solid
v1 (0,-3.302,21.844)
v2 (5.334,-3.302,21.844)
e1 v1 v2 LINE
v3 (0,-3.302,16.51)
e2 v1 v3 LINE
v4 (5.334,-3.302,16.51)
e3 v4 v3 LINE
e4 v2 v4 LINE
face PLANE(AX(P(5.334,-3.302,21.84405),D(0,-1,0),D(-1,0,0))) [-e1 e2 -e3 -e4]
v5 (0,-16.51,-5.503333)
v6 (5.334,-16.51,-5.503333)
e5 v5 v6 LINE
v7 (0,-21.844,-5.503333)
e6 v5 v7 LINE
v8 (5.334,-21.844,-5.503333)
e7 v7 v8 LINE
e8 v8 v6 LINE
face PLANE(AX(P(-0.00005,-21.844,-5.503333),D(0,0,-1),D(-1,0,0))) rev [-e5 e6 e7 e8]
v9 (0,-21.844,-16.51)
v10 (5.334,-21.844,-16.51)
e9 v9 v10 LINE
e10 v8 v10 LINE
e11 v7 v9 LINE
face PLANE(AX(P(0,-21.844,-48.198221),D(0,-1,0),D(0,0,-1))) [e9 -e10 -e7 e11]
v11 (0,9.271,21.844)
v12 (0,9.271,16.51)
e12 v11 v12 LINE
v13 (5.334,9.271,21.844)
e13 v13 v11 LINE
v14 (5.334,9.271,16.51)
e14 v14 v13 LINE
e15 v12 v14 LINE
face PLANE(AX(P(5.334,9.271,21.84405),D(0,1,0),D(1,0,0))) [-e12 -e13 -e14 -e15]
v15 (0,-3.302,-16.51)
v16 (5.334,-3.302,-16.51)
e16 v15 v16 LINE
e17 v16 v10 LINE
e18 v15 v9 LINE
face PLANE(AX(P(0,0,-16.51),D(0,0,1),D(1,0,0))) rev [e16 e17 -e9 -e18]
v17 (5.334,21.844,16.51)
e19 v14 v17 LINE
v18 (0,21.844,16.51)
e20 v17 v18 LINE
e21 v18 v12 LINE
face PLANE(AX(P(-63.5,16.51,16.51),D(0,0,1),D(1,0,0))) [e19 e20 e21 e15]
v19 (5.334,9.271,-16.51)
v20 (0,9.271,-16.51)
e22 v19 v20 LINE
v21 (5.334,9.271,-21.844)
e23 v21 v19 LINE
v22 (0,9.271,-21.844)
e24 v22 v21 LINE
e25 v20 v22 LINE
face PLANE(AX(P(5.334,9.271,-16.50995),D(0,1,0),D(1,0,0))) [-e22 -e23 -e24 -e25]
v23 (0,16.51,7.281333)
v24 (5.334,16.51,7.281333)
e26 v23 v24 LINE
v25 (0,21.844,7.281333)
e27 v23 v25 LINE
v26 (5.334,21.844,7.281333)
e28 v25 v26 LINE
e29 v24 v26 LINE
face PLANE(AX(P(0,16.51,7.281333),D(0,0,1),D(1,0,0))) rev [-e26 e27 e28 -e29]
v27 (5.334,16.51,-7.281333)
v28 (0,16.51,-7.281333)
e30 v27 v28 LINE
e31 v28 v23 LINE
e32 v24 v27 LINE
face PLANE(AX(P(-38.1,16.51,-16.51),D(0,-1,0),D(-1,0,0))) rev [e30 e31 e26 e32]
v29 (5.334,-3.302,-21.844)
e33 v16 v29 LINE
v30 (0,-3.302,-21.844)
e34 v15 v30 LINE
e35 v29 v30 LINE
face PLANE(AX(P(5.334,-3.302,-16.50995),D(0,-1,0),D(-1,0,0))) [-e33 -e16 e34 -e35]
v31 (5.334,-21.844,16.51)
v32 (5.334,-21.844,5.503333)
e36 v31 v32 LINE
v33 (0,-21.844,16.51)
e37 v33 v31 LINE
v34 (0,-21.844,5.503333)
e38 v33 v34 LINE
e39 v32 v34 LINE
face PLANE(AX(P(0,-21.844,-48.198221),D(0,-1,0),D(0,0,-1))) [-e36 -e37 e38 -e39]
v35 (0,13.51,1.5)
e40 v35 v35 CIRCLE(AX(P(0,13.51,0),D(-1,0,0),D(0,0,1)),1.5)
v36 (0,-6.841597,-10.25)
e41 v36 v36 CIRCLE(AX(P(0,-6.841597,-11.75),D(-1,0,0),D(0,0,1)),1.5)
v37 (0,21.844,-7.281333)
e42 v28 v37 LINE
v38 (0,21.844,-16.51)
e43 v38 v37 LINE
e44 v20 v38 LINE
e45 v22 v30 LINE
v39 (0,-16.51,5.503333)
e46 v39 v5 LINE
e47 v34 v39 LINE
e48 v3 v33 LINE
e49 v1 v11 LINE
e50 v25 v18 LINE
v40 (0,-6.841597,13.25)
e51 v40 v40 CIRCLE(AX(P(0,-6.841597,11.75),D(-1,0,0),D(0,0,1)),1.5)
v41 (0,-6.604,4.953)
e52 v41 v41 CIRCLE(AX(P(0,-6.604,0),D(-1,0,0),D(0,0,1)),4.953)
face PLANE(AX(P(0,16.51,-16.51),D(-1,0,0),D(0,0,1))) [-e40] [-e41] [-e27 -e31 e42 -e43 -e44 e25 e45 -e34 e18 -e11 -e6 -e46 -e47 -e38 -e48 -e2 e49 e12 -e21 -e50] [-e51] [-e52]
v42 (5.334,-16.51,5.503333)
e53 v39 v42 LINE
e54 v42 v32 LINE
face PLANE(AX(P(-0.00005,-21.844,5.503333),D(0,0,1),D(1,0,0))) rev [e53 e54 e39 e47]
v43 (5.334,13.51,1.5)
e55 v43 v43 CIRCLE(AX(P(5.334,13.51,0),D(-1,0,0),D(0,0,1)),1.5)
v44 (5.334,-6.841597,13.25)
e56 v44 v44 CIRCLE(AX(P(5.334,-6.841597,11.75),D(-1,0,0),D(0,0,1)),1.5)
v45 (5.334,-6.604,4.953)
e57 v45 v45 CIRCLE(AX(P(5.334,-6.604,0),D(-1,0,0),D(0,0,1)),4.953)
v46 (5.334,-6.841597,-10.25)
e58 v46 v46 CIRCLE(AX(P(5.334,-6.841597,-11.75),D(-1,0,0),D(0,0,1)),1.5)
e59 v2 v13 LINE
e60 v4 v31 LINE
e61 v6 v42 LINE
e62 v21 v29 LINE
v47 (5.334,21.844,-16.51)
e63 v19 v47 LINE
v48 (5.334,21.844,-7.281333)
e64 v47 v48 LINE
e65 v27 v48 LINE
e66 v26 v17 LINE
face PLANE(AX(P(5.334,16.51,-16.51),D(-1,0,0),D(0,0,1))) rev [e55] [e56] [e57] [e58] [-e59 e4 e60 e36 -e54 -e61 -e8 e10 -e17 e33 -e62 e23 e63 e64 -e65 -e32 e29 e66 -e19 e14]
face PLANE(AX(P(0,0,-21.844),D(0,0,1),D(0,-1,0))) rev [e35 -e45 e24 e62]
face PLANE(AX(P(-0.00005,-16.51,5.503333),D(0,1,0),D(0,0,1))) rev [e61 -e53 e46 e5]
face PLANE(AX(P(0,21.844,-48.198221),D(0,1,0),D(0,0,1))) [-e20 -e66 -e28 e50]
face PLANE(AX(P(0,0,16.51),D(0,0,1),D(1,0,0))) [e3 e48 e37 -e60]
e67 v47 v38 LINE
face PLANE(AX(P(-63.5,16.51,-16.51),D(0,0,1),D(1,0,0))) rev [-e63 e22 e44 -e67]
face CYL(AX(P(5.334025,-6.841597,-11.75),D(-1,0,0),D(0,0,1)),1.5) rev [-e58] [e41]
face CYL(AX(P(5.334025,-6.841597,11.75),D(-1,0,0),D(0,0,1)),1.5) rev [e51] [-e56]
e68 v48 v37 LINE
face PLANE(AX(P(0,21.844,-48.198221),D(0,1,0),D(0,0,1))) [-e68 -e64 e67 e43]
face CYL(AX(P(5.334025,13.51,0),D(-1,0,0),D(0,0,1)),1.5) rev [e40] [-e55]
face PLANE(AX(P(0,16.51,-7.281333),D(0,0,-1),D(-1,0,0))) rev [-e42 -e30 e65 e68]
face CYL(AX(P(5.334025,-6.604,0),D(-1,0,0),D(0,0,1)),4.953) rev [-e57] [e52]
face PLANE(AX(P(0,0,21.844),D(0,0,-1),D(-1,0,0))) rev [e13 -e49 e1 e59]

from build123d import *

# Parameters (mm, degrees)
SKETCH2_W             = 33.02
SKETCH2_H             = 33.02
BOSS_EXTRUDE2_DEPTH   = 5.334
SKETCH3_W             = 33.02
SKETCH3_H             = 5.334
BOSS_EXTRUDE6_DEPTH   = 5.334
SKETCH6_W             = 11.006666666
SKETCH6_H             = 5.334
CUT_EXTRUDE2_DEPTH    = 32.349198203
CAVITY2_START         = -21.844
CAVITY2_OUTLINE_W     = 5.334
CAVITY2_OUTLINE_H     = 13.208
CAVITY2_OUTLINE_H_2   = 12.573
CAVITY2_DEPTH         = 5.334
CAVITY2_START_2       = 16.51
CAVITY2_2_OUTLINE_W   = 5.334
CAVITY2_2_OUTLINE_H   = 13.208
CAVITY2_2_OUTLINE_H_2 = 12.573
CAVITY2_2_DEPTH       = 5.334
CAVITY2_START_3       = -7.281333333
CAVITY2_3_OUTLINE_W   = 5.334
CAVITY2_3_OUTLINE_H   = 5.334
CAVITY2_3_DEPTH       = 14.562666666
SKETCH7_R             = 1.5
SKETCH7_R_2           = 4.953
CUT_EXTRUDE3_DEPTH    = 32.349198203


# Read off the part's stored shape, not the designer's step: Cavity2
with BuildPart() as part:
    # Sketch2 → Boss-Extrude2 (new body)
    with BuildSketch(Plane(origin=(0, 0, 0), x_dir=(0, 0, -1), z_dir=(1, 0, 0))):
        Rectangle(SKETCH2_W, SKETCH2_H)
    extrude(amount=BOSS_EXTRUDE2_DEPTH)

    # Sketch3 → Boss-Extrude6 (add, through all)
    with BuildSketch(Plane(origin=(5.334, 0, 0), x_dir=(0, 0, -1), z_dir=(1, 0, 0))):
        Polygon((-16.51, 16.51), (-16.51, 21.844), (-21.844, 21.844), (-21.844, -16.51), (-16.51, -16.51), align=None)
        with Locations((0, 19.177)):
            Rectangle(SKETCH3_W, SKETCH3_H)
        Polygon((21.844, 21.844), (21.844, -16.51), (16.51, -16.51), (16.51, 16.51), (16.51, 21.844), align=None)
        with Locations((0, -19.177)):
            Rectangle(SKETCH3_W, SKETCH3_H)
    extrude(amount=-BOSS_EXTRUDE6_DEPTH)

    # Sketch6 → Cut-Extrude2 (cut, through all)
    with BuildSketch(Plane(origin=(5.334, 0, 0), x_dir=(0, 0, -1), z_dir=(1, 0, 0))):
        with Locations((0, -19.177)):
            Rectangle(SKETCH6_W, SKETCH6_H)
    extrude(amount=-CUT_EXTRUDE2_DEPTH, mode=Mode.SUBTRACT)

    # Cavity2 outline → Cavity2 (cut)
    with BuildSketch(Plane.XY.offset(CAVITY2_START)):
        with Locations((2.667, -9.906)):
            Rectangle(CAVITY2_OUTLINE_W, CAVITY2_OUTLINE_H)
        with Locations((2.667, 15.5575)):
            Rectangle(CAVITY2_OUTLINE_W, CAVITY2_OUTLINE_H_2)
    extrude(amount=CAVITY2_DEPTH, mode=Mode.SUBTRACT)

    # Cavity2 2 outline → Cavity2 2 (cut)
    with BuildSketch(Plane.XY.offset(CAVITY2_START_2)):
        with Locations((2.667, -9.906)):
            Rectangle(CAVITY2_2_OUTLINE_W, CAVITY2_2_OUTLINE_H)
        with Locations((2.667, 15.5575)):
            Rectangle(CAVITY2_2_OUTLINE_W, CAVITY2_2_OUTLINE_H_2)
    extrude(amount=CAVITY2_2_DEPTH, mode=Mode.SUBTRACT)

    # Cavity2 3 outline → Cavity2 3 (cut)
    with BuildSketch(Plane.XY.offset(CAVITY2_START_3)):
        with Locations((2.667, 19.177)):
            Rectangle(CAVITY2_3_OUTLINE_W, CAVITY2_3_OUTLINE_H)
    extrude(amount=CAVITY2_3_DEPTH, mode=Mode.SUBTRACT)

    # Sketch7 → Cut-Extrude3 (cut, through all)
    with BuildSketch(Plane.ZY):
        with Locations((0, 13.51)):
            Circle(SKETCH7_R)
        with Locations((11.75, -6.841596989)):
            Circle(SKETCH7_R)
        with Locations((0, -6.604)):
            Circle(SKETCH7_R_2)
        with Locations((-11.75, -6.841596989)):
            Circle(SKETCH7_R)
    extrude(amount=-CUT_EXTRUDE3_DEPTH, mode=Mode.SUBTRACT)


solid = part.part
